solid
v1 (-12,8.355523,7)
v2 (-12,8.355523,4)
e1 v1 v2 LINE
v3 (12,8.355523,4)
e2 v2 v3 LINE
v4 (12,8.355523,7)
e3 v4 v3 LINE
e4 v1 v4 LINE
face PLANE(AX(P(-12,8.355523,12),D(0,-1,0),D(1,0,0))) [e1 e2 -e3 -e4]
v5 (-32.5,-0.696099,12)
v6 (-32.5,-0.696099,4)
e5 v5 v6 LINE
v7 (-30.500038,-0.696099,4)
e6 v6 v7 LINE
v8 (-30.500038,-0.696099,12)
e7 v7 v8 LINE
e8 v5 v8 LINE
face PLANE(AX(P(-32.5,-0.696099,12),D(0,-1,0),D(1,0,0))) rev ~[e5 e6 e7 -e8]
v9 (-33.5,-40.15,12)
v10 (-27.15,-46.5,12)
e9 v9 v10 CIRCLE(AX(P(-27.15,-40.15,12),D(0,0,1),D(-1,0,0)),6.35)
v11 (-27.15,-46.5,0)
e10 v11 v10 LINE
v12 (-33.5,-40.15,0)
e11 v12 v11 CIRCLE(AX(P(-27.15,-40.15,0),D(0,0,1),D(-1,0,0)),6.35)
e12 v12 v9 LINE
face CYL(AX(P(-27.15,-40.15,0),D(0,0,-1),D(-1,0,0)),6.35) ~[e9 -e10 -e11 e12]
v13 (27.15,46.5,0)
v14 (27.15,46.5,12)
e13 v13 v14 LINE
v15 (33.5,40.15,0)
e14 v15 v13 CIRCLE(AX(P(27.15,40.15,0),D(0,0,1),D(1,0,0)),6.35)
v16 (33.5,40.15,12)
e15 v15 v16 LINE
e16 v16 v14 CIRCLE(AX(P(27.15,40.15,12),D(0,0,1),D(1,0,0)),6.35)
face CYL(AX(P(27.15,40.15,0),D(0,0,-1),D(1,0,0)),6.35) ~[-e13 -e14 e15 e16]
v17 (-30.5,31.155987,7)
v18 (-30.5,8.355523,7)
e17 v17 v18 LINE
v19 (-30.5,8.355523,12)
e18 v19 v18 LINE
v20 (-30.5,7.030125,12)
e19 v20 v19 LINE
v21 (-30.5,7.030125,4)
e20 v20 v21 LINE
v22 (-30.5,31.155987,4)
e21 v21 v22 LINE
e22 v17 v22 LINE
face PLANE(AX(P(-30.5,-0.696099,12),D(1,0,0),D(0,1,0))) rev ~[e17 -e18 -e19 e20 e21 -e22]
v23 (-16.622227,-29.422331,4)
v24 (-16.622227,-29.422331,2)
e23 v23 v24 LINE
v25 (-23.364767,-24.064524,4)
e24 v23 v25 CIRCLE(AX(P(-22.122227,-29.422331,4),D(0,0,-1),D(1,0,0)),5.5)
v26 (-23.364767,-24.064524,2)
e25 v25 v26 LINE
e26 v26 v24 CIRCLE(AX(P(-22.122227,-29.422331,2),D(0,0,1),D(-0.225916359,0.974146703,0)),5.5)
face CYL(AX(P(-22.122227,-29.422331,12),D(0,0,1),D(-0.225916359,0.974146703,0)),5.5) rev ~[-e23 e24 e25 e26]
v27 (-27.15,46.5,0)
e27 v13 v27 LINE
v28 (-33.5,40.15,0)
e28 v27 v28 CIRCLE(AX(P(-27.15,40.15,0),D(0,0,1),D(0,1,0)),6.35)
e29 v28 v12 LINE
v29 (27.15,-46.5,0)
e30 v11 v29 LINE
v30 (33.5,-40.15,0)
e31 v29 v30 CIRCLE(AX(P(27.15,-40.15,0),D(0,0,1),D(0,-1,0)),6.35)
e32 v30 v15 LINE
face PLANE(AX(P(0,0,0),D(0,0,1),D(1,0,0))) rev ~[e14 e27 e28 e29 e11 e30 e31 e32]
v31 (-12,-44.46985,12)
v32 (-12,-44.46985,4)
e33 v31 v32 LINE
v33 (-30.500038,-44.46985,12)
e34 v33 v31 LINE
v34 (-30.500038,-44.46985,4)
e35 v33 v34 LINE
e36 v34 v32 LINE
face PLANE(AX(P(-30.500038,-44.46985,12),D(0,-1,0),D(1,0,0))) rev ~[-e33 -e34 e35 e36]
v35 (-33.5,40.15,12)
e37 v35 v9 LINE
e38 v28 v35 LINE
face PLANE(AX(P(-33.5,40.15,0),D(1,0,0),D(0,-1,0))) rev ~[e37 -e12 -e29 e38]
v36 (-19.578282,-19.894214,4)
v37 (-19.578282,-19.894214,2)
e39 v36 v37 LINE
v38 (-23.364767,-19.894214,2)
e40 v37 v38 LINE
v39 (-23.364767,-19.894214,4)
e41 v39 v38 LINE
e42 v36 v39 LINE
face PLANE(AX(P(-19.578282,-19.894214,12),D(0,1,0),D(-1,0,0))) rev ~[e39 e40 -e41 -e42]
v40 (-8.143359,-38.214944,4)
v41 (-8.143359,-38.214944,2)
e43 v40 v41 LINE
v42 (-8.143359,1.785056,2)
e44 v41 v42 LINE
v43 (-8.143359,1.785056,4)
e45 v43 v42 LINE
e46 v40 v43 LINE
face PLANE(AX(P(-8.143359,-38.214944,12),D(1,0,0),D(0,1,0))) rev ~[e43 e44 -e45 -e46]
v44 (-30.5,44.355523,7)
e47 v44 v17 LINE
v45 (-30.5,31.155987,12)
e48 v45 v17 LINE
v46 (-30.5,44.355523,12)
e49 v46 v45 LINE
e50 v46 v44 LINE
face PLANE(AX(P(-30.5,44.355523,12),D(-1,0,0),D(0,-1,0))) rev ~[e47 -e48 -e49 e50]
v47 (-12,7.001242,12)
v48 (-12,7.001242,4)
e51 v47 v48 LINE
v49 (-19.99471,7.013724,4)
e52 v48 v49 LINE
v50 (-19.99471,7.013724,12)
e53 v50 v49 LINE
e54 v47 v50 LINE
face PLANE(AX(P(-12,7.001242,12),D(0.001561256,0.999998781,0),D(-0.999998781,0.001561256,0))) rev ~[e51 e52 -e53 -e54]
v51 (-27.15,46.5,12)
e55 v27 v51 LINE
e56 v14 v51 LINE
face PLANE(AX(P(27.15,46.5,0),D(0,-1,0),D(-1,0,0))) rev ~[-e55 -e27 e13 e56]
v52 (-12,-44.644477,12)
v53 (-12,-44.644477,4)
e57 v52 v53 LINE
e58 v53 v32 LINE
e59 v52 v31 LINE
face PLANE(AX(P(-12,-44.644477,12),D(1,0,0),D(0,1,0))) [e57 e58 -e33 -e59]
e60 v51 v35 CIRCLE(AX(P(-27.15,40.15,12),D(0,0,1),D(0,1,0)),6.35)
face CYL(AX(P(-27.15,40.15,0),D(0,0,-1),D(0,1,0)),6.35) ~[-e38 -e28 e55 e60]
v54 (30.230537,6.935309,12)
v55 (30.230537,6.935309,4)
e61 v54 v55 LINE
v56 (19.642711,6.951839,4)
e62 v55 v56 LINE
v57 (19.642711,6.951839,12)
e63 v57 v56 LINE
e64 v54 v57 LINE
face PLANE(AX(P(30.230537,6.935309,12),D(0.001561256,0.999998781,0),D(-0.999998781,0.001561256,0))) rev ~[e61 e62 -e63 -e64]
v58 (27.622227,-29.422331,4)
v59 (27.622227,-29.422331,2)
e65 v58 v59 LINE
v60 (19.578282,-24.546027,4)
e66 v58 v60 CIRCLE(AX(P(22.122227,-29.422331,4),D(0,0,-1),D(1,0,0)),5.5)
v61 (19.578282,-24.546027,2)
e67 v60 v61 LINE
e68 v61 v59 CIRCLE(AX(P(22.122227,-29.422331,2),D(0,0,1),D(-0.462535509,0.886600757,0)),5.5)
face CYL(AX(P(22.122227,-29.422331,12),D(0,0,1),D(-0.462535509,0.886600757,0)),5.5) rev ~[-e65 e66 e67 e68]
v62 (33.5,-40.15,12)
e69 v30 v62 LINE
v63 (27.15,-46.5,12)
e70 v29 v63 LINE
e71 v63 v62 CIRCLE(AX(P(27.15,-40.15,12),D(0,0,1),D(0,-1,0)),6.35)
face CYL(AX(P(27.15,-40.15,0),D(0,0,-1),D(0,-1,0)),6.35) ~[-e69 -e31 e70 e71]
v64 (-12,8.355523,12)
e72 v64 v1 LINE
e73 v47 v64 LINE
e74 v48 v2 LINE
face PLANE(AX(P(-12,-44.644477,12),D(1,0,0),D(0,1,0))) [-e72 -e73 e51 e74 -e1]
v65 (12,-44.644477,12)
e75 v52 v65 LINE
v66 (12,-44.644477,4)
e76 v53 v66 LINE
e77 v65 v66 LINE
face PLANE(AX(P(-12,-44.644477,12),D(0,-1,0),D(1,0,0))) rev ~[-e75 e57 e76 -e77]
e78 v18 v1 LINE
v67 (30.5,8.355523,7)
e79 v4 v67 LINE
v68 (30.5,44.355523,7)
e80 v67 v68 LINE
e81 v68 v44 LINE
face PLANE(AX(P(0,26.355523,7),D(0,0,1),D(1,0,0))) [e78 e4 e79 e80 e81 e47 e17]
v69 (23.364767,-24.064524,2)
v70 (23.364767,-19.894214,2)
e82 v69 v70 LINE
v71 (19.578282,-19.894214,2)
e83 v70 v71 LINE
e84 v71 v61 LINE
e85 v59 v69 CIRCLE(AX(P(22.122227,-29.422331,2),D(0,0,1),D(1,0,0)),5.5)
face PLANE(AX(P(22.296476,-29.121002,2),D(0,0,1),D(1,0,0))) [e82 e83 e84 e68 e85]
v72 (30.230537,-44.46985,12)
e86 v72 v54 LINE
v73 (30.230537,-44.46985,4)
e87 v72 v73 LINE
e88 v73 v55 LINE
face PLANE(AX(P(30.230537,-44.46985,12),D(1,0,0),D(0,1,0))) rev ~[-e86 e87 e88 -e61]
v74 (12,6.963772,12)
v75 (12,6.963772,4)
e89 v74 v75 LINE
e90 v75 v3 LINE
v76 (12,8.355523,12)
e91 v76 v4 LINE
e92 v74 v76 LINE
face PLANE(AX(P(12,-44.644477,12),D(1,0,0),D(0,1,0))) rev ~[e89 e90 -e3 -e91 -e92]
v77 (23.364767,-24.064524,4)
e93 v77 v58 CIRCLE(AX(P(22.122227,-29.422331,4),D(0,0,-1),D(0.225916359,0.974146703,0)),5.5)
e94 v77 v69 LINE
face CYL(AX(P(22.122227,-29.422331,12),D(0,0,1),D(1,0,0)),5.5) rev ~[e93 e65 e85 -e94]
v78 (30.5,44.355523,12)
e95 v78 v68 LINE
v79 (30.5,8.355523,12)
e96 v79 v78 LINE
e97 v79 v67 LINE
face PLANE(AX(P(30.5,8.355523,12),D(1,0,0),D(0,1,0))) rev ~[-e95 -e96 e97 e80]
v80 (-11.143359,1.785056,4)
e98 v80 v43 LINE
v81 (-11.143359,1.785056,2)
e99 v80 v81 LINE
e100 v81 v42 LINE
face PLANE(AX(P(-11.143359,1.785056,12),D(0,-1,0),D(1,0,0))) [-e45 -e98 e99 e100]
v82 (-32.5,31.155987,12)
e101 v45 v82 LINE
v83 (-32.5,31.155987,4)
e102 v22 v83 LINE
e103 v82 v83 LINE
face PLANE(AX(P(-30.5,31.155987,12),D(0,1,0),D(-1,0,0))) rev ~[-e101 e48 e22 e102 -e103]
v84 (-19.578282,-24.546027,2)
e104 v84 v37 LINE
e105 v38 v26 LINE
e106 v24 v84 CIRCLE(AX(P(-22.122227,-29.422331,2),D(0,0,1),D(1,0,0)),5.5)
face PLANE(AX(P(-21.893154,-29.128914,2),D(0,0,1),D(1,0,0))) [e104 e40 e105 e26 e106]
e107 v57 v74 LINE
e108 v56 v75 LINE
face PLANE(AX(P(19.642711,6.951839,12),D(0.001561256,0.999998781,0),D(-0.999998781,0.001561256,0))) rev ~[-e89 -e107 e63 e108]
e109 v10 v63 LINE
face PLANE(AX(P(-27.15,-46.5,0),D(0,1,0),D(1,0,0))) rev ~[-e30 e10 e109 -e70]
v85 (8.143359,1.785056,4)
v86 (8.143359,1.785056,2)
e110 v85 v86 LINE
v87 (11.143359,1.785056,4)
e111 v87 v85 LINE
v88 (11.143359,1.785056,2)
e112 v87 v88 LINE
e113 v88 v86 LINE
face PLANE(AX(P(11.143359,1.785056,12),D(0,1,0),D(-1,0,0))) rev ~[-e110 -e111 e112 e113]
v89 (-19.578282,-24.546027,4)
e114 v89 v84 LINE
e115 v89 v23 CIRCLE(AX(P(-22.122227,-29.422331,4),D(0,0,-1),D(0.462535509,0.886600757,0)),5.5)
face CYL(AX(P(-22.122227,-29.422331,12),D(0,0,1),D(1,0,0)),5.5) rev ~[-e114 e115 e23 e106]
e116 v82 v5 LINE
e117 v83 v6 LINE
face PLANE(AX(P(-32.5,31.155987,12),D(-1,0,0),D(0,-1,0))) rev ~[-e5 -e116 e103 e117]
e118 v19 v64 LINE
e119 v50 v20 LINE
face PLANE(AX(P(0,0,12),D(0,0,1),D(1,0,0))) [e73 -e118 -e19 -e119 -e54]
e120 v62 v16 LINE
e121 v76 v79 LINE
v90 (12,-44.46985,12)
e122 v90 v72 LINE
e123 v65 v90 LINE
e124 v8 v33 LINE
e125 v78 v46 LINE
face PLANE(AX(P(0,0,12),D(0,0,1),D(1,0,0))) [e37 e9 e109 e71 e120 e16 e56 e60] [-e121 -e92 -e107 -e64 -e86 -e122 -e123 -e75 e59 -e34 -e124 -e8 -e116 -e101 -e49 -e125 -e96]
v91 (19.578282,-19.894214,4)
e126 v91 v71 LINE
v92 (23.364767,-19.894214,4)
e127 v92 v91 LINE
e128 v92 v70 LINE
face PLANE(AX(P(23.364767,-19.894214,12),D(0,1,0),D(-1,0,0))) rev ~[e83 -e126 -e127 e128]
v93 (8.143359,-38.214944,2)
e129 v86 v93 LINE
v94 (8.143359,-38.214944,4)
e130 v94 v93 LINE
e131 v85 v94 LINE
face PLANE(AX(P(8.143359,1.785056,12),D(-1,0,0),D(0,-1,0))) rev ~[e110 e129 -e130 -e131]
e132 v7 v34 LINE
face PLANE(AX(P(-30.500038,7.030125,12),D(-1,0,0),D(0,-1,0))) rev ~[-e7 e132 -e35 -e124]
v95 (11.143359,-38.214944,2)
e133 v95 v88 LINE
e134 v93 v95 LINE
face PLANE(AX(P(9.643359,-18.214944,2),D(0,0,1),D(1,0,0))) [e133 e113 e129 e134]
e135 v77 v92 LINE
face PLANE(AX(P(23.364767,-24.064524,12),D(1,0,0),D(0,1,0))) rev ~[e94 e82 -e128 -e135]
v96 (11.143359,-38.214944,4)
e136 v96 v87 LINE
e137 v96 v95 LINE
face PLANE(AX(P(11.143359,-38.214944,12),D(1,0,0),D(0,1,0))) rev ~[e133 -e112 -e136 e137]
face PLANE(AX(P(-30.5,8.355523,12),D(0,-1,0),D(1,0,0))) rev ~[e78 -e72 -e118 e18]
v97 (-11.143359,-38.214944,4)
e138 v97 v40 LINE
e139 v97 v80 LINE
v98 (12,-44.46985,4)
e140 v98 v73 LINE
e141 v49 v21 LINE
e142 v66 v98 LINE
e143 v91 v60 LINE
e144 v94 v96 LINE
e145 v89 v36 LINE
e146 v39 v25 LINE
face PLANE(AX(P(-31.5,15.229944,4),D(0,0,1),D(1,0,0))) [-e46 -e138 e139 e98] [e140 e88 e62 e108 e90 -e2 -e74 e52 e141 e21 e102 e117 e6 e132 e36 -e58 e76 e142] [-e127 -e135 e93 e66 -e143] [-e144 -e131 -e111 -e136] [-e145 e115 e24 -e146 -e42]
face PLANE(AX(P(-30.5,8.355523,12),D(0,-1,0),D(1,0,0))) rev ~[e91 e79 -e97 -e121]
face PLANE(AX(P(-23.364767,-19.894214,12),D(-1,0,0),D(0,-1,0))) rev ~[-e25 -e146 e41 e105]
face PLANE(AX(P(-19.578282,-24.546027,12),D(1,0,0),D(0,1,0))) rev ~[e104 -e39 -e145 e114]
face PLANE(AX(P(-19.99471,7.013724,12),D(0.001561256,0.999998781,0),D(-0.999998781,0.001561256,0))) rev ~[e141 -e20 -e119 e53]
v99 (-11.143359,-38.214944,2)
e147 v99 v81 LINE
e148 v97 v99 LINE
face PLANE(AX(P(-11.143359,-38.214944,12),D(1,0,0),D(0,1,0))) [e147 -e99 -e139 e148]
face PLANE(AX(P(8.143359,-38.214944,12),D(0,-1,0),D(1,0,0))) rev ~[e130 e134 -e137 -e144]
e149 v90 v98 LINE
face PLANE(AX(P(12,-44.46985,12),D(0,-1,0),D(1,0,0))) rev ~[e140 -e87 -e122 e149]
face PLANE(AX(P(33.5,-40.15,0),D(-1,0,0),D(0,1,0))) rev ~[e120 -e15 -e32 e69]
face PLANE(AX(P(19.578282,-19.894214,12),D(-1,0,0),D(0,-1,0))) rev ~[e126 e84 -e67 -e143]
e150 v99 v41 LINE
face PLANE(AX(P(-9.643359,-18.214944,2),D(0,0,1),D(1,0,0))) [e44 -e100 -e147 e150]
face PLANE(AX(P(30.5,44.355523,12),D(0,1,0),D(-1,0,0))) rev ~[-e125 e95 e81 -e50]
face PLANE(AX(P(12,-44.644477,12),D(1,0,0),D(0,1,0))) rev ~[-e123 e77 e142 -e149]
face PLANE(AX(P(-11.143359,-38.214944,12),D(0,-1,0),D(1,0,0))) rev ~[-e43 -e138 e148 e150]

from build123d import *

# Parameters (mm, degrees)
F1_DEPTH = 12
F3_DEPTH = 5
F2_W     = 24
F2_H     = 53
F5_DEPTH = 8
F6_DEPTH = 10
F7_W     = 3
F7_H     = 40
F8_DEPTH = 10
F9_DEPTH = 10


with BuildPart() as f1:
    # F0 (on Top) → F1 (new body)
    with BuildSketch(Plane.XY):
        with BuildLine():
            Line((27.15, 46.5), (-27.15, 46.5))
            ThreePointArc((-27.15, 46.5), (-31.6401280605, 44.6401280605), (-33.5, 40.15))
            Line((-33.5, 40.15), (-33.5, -40.15))
            ThreePointArc((-33.5, -40.15), (-31.6401280605, -44.6401280605), (-27.15, -46.5))
            Line((-27.15, -46.5), (27.15, -46.5))
            ThreePointArc((27.15, -46.5), (31.6401280605, -44.6401280605), (33.5, -40.15))
            Line((33.5, -40.15), (33.5, 40.15))
            ThreePointArc((33.5, 40.15), (31.6401280605, 44.6401280605), (27.15, 46.5))
        make_face()
    extrude(amount=F1_DEPTH)

    # F2 (on face) → F3 (cut)
    with BuildSketch(Plane.XY.offset(12)):
        Polygon((-30.5, 31.1559867114), (-30.5, 8.3555228412), (-12, 8.3555228412), (12, 8.3555228412), (30.5, 8.3555228412), (30.5, 44.3555228412), (-30.5, 44.3555228412), align=None)
    extrude(amount=-F3_DEPTH, mode=Mode.SUBTRACT)

    # F4 (on face) + F2 (on face) → F5 (cut)
    with BuildSketch(Plane.XY.offset(12)):
        Polygon((-19.9947099381, 7.0137236979), (-30.5000375956, 7.0301252197), (-30.5000375956, -0.696099014), (-30.5000375956, -0.6988210371), (-30.5000375956, -44.4698496722), (-12, -44.4698496722), (-12, 7.0012418968), align=None)
        with BuildLine():
            Line((-19.57828179, -19.8942141583), (-19.57828179, -24.546026914))
            ThreePointArc((-19.57828179, -24.546026914), (-17.4189463665, -26.5711645765), (-16.6222270916, -29.4223310783))
            ThreePointArc((-16.6222270916, -29.4223310783), (-25.5439247807, -33.7283715941), (-23.364767064, -24.064524212))
            Line((-23.364767064, -24.064524212), (-23.364767064, -19.8942141583))
            Line((-23.364767064, -19.8942141583), (-19.57828179, -19.8942141583))
        make_face(mode=Mode.SUBTRACT)
        Polygon((19.6427109083, 6.9518394763), (12, 6.9637717162), (12, -44.4698496722), (30.2305370569, -44.4698496722), (30.2305370569, 6.9353091531), align=None)
        with BuildLine():
            Line((23.364767064, -19.8942141583), (23.364767064, -24.064524212))
            ThreePointArc((23.364767064, -24.064524212), (26.4282676075, -26.0006333892), (27.6222270916, -29.4223310783))
            ThreePointArc((27.6222270916, -29.4223310783), (19.2710605898, -34.1256118034), (19.57828179, -24.546026914))
            Line((19.57828179, -24.546026914), (19.57828179, -19.8942141583))
            Line((19.57828179, -19.8942141583), (23.364767064, -19.8942141583))
        make_face(mode=Mode.SUBTRACT)
    with BuildSketch(Plane.XY.offset(12)):
        Polygon((-30.5, -0.696099014), (-30.5, 8.3555228412), (-30.5, 31.1559867114), (-32.5, 31.1559867114), (-32.5, -0.696099014), align=None)
        with Locations((0, -18.1444771588)):
            Rectangle(F2_W, F2_H)
        with BuildLine():
            ThreePointArc((-23.364767064, -24.064524212), (-21.4284150344, -23.9662679528), (-19.57828179, -24.546026914))
            Line((-19.57828179, -24.546026914), (-19.57828179, -19.8942141583))
            Line((-19.57828179, -19.8942141583), (-23.364767064, -19.8942141583))
            Line((-23.364767064, -19.8942141583), (-23.364767064, -24.064524212))
        make_face()
        with BuildLine():
            ThreePointArc((19.57828179, -24.546026914), (21.4284150344, -23.9662679528), (23.364767064, -24.064524212))
            Line((23.364767064, -24.064524212), (23.364767064, -19.8942141583))
            Line((23.364767064, -19.8942141583), (19.57828179, -19.8942141583))
            Line((19.57828179, -19.8942141583), (19.57828179, -24.546026914))
        make_face()
    extrude(amount=-F5_DEPTH, mode=Mode.SUBTRACT)

    # F2 (on face) → F6 (cut)
    with BuildSketch(Plane.XY.offset(12)):
        with BuildLine():
            ThreePointArc((-23.364767064, -24.064524212), (-25.5439247807, -33.7283715941), (-16.6222270916, -29.4223310783))
            ThreePointArc((-16.6222270916, -29.4223310783), (-17.4189463665, -26.5711645765), (-19.57828179, -24.546026914))
            ThreePointArc((-19.57828179, -24.546026914), (-21.4284150344, -23.9662679528), (-23.364767064, -24.064524212))
        make_face()
        with BuildLine():
            ThreePointArc((19.57828179, -24.546026914), (19.2710605898, -34.1256118034), (27.6222270916, -29.4223310783))
            ThreePointArc((27.6222270916, -29.4223310783), (26.4282676075, -26.0006333892), (23.364767064, -24.064524212))
            ThreePointArc((23.364767064, -24.064524212), (21.4284150344, -23.9662679528), (19.57828179, -24.546026914))
        make_face()
    extrude(amount=-F6_DEPTH, mode=Mode.SUBTRACT)

    # F7 (on face) → F8 (cut)
    with BuildSketch(Plane.XY.offset(12)):
        with Locations((-9.6433593556, -18.214944303)):
            Rectangle(F7_W, F7_H)
        Polygon((8.1433593556, 1.785055697), (8.1433593556, -38.214944303), (9.8566406444, -38.214944303), (11.1433593556, -38.214944303), (11.1433593556, 1.785055697), align=None)
    extrude(amount=-F8_DEPTH, mode=Mode.SUBTRACT)

    # F4 (on face) + F2 (on face) → F9 (cut)
    with BuildSketch(Plane.XY.offset(12)):
        with BuildLine():
            ThreePointArc((-16.6222270916, -29.4223310783), (-17.4189463665, -26.5711645765), (-19.57828179, -24.546026914))
            Line((-19.57828179, -24.546026914), (-19.57828179, -19.8942141583))
            Line((-19.57828179, -19.8942141583), (-23.364767064, -19.8942141583))
            Line((-23.364767064, -19.8942141583), (-23.364767064, -24.064524212))
            ThreePointArc((-23.364767064, -24.064524212), (-25.5439247807, -33.7283715941), (-16.6222270916, -29.4223310783))
        make_face()
    with BuildSketch(Plane.XY.offset(12)):
        with BuildLine():
            ThreePointArc((19.57828179, -24.546026914), (19.2710605898, -34.1256118034), (27.6222270916, -29.4223310783))
            ThreePointArc((27.6222270916, -29.4223310783), (26.4282676075, -26.0006333892), (23.364767064, -24.064524212))
            ThreePointArc((23.364767064, -24.064524212), (21.4284150344, -23.9662679528), (19.57828179, -24.546026914))
        make_face()
        with BuildLine():
            ThreePointArc((19.57828179, -24.546026914), (21.4284150344, -23.9662679528), (23.364767064, -24.064524212))
            Line((23.364767064, -24.064524212), (23.364767064, -19.8942141583))
            Line((23.364767064, -19.8942141583), (19.57828179, -19.8942141583))
            Line((19.57828179, -19.8942141583), (19.57828179, -24.546026914))
        make_face()
    extrude(amount=-F9_DEPTH, mode=Mode.SUBTRACT)


solid = f1.part
